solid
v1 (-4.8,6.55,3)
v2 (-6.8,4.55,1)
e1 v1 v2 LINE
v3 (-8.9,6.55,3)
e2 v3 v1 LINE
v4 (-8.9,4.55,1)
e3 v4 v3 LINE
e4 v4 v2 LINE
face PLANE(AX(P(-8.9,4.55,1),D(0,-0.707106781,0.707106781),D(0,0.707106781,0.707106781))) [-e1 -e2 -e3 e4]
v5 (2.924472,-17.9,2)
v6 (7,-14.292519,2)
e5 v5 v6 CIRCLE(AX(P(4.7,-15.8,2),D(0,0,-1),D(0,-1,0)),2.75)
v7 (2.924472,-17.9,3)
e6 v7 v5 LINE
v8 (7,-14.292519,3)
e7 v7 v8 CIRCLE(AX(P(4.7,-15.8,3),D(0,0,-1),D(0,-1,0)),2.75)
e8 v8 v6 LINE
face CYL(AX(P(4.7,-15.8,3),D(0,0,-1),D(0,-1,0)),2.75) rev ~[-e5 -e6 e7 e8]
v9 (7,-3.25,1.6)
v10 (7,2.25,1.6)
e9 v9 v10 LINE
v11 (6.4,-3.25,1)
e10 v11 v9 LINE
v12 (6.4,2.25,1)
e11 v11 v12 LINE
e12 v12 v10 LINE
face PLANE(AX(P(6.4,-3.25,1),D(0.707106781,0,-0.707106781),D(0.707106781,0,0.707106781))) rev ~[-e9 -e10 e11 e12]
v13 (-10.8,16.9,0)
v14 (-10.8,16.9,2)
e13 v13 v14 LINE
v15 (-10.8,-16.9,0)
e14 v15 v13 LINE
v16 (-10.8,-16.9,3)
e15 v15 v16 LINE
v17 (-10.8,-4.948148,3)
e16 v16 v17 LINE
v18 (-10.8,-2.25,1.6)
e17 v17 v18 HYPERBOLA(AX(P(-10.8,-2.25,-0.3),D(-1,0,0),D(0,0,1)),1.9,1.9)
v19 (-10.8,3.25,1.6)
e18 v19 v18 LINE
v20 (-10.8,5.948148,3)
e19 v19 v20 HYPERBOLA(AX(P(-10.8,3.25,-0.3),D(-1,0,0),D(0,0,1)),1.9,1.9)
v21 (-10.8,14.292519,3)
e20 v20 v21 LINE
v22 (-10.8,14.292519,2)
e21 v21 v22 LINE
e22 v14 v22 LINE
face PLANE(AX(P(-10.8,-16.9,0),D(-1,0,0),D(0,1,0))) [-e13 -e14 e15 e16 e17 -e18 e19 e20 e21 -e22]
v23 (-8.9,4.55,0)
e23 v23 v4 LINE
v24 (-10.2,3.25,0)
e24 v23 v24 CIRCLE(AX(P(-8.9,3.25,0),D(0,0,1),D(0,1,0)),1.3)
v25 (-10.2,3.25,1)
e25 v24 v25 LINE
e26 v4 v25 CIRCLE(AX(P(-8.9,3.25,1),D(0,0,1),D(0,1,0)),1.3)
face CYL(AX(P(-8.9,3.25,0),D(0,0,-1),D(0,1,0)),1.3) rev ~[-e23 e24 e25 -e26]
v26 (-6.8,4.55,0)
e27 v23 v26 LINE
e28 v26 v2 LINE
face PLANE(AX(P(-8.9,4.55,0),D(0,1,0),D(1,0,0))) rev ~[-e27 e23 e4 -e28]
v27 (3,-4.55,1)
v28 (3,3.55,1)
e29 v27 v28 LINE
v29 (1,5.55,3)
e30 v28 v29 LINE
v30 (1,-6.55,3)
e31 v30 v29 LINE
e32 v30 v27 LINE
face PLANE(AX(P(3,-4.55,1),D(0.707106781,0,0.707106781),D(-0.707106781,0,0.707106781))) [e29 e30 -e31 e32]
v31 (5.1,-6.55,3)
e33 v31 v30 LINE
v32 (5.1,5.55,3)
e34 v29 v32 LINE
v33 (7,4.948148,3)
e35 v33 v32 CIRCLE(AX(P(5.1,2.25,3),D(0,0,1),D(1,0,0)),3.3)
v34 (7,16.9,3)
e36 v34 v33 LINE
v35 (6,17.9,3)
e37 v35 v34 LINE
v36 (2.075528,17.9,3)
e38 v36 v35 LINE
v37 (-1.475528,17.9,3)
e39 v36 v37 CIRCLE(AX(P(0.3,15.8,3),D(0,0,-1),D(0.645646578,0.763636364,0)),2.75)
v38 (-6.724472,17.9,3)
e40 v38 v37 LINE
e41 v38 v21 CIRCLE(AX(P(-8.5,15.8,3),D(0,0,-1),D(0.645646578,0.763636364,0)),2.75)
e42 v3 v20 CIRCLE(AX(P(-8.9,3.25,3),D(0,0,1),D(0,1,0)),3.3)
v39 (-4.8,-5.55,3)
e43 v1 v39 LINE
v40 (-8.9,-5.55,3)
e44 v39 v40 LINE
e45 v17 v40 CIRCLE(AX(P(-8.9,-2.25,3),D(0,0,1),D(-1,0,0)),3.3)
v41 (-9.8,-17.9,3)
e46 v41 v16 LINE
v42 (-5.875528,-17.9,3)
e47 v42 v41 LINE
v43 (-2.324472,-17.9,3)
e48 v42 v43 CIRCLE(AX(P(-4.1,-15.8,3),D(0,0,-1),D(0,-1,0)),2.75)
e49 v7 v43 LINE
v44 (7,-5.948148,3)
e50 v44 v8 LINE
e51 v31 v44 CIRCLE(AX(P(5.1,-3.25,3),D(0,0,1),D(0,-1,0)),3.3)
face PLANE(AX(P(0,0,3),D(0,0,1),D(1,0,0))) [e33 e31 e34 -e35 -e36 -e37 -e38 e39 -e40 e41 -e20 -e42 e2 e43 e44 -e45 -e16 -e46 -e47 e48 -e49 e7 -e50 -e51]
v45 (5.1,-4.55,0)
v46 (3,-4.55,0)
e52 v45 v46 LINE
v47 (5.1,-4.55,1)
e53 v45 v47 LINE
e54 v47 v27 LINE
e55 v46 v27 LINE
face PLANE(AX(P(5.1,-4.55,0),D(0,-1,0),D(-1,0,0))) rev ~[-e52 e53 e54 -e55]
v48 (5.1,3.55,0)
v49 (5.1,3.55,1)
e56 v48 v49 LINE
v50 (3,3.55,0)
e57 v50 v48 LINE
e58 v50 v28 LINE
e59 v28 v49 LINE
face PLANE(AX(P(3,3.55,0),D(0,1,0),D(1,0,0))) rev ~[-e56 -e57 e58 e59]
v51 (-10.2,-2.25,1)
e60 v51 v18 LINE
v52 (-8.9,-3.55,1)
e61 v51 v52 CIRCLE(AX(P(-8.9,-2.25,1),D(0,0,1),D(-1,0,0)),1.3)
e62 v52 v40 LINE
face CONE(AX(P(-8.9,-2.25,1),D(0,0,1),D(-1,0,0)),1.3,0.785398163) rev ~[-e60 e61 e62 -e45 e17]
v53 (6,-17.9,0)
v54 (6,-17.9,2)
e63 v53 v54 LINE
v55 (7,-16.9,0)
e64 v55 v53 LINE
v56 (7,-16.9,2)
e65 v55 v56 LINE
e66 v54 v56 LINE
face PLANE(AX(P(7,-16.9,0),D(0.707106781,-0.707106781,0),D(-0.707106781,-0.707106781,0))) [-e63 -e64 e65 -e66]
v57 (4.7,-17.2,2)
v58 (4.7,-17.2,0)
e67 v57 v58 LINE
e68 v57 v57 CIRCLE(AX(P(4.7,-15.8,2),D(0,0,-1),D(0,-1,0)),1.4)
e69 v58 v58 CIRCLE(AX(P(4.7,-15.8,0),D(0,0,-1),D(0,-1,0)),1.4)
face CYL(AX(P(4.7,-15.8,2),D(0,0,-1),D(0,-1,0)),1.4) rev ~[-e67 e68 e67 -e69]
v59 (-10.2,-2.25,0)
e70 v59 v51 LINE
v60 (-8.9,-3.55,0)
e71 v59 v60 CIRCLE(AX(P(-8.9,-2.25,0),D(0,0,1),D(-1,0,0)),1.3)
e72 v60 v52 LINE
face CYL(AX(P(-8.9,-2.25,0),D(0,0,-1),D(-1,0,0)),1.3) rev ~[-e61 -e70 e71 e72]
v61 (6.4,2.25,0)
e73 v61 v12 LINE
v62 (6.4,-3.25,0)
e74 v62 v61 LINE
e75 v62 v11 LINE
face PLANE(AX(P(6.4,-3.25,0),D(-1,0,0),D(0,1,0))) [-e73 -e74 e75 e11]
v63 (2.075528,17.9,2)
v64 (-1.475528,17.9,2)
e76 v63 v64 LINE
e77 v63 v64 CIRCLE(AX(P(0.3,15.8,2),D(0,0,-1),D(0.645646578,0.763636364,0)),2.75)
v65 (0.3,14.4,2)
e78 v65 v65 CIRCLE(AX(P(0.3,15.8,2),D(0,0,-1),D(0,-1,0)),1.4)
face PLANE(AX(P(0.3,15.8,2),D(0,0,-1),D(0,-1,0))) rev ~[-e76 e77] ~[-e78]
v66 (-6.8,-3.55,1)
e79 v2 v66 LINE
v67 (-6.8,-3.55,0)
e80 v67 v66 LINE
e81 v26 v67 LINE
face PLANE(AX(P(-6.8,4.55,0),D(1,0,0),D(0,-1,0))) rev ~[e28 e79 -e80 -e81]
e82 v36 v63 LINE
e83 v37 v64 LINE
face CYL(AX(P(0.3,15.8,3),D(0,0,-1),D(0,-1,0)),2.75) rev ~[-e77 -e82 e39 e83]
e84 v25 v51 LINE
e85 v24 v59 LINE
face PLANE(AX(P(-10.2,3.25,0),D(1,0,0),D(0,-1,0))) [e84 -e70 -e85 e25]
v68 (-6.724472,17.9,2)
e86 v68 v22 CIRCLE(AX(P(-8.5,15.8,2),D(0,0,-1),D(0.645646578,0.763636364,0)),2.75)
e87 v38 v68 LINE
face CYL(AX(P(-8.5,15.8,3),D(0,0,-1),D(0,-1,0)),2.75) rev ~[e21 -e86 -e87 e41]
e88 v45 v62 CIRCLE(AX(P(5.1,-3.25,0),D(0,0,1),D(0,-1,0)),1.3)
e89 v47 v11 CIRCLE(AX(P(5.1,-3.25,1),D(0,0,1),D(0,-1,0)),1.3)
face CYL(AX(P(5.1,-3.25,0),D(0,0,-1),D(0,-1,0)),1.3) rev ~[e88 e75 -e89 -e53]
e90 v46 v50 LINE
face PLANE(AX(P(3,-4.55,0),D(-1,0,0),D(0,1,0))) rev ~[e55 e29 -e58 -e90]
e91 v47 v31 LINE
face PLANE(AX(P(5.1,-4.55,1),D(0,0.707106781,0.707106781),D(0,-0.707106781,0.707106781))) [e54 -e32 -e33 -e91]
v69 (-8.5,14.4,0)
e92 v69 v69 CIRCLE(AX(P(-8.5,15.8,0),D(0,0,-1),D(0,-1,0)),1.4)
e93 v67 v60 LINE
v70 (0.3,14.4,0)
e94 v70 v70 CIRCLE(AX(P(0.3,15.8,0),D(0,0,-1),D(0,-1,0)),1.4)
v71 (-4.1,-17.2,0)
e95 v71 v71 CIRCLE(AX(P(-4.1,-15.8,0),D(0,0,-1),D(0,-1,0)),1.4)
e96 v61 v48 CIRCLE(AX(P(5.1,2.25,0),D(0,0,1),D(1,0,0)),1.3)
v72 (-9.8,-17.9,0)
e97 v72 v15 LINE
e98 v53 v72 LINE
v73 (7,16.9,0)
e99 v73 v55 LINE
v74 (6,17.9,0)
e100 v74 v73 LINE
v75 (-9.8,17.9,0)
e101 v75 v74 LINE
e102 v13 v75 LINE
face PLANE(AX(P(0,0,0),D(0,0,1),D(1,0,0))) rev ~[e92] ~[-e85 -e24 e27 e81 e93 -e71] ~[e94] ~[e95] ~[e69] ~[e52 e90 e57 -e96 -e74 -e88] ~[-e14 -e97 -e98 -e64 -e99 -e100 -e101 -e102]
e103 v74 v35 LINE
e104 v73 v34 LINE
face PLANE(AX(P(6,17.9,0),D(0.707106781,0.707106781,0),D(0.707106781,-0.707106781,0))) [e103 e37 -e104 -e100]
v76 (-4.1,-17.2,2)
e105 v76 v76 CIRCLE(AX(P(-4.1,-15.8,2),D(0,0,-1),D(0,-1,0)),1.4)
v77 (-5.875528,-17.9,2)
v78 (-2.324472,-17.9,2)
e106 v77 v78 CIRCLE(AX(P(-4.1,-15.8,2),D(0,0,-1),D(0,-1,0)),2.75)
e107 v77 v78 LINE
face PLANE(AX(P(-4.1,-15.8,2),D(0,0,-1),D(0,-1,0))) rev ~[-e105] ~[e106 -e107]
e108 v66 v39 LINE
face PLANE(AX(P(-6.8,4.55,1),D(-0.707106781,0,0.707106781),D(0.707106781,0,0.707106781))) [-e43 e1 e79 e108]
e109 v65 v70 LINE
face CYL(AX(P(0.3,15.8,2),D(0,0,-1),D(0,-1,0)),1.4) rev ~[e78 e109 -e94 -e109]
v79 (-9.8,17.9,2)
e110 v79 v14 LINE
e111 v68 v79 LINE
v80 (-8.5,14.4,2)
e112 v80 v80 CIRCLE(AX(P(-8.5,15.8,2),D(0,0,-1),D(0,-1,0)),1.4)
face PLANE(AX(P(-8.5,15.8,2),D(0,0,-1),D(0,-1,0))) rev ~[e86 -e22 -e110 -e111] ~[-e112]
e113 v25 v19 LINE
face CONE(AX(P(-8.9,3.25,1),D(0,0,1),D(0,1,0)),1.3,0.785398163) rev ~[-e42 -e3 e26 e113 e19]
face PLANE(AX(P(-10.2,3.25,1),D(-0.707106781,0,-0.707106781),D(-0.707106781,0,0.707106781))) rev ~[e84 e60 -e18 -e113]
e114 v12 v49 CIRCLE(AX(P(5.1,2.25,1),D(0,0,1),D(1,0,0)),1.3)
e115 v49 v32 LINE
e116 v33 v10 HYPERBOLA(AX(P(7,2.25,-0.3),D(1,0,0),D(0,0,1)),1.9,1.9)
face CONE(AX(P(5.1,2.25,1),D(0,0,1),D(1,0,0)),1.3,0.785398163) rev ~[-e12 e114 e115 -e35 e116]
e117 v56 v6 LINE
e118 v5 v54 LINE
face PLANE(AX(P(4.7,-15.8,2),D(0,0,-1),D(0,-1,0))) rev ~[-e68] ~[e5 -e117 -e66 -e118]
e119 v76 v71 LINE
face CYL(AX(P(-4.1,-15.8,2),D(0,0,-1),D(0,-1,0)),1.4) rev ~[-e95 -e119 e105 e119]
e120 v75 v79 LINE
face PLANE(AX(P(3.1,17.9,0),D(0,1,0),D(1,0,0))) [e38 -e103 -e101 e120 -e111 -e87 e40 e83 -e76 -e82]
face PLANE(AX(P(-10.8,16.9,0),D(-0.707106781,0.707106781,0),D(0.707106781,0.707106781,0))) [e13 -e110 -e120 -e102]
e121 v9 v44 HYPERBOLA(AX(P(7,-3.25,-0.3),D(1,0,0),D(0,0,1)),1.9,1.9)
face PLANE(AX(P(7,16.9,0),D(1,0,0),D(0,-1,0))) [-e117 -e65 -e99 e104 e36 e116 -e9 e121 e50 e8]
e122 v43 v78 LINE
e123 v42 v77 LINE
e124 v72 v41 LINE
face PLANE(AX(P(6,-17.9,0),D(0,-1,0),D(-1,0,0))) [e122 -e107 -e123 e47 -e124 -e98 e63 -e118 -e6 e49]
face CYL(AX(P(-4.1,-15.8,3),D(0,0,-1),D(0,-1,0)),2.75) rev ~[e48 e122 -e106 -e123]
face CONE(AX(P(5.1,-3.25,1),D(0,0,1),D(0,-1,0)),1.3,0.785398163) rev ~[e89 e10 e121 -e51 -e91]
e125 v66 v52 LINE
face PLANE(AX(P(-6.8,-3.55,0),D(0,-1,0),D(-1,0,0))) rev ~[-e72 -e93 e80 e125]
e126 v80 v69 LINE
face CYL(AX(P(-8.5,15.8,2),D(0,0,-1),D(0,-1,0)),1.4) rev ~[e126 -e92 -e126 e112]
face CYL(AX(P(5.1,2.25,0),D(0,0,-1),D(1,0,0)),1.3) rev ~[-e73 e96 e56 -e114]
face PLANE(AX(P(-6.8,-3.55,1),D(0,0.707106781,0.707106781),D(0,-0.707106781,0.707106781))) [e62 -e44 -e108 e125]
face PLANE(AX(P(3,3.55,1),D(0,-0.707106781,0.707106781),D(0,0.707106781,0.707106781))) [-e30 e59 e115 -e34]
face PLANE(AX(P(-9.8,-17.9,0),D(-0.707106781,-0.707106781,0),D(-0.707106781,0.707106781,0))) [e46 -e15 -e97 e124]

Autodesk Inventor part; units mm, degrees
ref_plane "YZ Plane" through (0, 0, 0) normal (1, 0, 0) x (0, 1, 0)
ref_plane "XZ Plane" through (0, 0, 0) normal (0, 1, 0) x (-1, 0, 0)
ref_plane "XY Plane" through (0, 0, 0) normal (0, 0, 1) x (1, 0, 0)
ref_plane "Arbeitsebene1" through (0, 0, 0) normal (0, 0, 1) x (1, 0, 0)
sketch "Skizze1" plane through (0, 0, 0) normal (0, 0, 1) x (1, 0, 0)
  line L0 (6, 17.9) -> (7, 16.9) projected
  line L1 (3.1, 17.9) -> (6, 17.9) projected
  line L2 (3.1, 14) -> (3.1, 17.9) projected
  line L3 (3.5, 14) -> (3.1, 14) projected
  line L4 (3.5, 10) -> (3.5, 14) projected
  line L5 (6.4, 10) -> (3.5, 10) projected
  line L6 (6.4, -11.4) -> (6.4, 10) projected
  line L7 (3.8, -11.4) -> (6.4, -11.4) projected
  line L8 (3.8, -14.4) -> (3.8, -11.4) projected
  line L9 (1.3, -14.4) -> (3.8, -14.4) projected
  line L10 (1.3, -13.4) -> (1.3, -14.4) projected
  line L11 (-0.7, -13.4) -> (1.3, -13.4) projected
  line L12 (-0.7, -14.4) -> (-0.7, -13.4) projected
  line L13 (-6.9, -14.4) -> (-5.1, -14.4) projected
  line L14 (-4.1, -13.4) -> (-4.1, -14.4) projected
  line L15 (-5.1, -13.4) -> (-4.1, -13.4) projected
  line L16 (-5.1, -14.4) -> (-5.1, -13.4) projected
  line L17 (-6.9, -17.9) -> (-6.9, -14.4) projected
  line L18 (6, -17.9) -> (-6.9, -17.9) projected
  line L19 (7, -16.9) -> (6, -17.9) projected
  line L20 (7, 16.9) -> (7, -16.9) projected
  line L21 (6, 17.9) -> (7, 16.9) projected
  line L22 (3.1, 17.9) -> (6, 17.9) projected
  line L23 (3.1, 14) -> (3.1, 17.9) projected
  line L24 (3.5, 14) -> (3.1, 14) projected
  line L25 (3.5, 10) -> (3.5, 14) projected
  line L26 (6.4, 10) -> (3.5, 10) projected
  line L27 (6.4, -11.4) -> (6.4, 10) projected
  line L28 (3.8, -11.4) -> (6.4, -11.4) projected
  line L29 (3.8, -14.4) -> (3.8, -11.4) projected
  line L30 (1.3, -14.4) -> (3.8, -14.4) projected
  line L31 (1.3, -13.4) -> (1.3, -14.4) projected
  line L32 (-0.7, -13.4) -> (1.3, -13.4) projected
  line L33 (-0.7, -14.4) -> (-0.7, -13.4) projected
  line L34 (-6.9, -14.4) -> (-5.1, -14.4) projected
  line L35 (-4.1, -13.4) -> (-4.1, -14.4) projected
  line L36 (-5.1, -13.4) -> (-4.1, -13.4) projected
  line L37 (-5.1, -14.4) -> (-5.1, -13.4) projected
  line L38 (-6.9, -17.9) -> (-6.9, -14.4) projected
  line L39 (6, -17.9) -> (-6.9, -17.9) projected
  line L40 (7, -16.9) -> (6, -17.9) projected
  line L41 (7, 16.9) -> (7, -16.9) projected
  line L42 (-9.8, -17.9) -> (-10.8, -16.9) projected
  line L43 (-6.9, -17.9) -> (-9.8, -17.9) projected
  line L44 (-6.9, -14) -> (-6.9, -17.9) projected
  line L45 (-7.3, -14) -> (-6.9, -14) projected
  line L46 (-7.3, -10) -> (-7.3, -14) projected
  line L47 (-10.2, -10) -> (-7.3, -10) projected
  line L48 (-10.2, 11.4) -> (-10.2, -10) projected
  line L49 (-7.6, 11.4) -> (-10.2, 11.4) projected
  line L50 (-7.6, 14.4) -> (-7.6, 11.4) projected
  line L51 (-5.1, 14.4) -> (-7.6, 14.4) projected
  line L52 (-5.1, 13.4) -> (-5.1, 14.4) projected
  line L53 (-3.1, 13.4) -> (-5.1, 13.4) projected
  line L54 (-3.1, 14.4) -> (-3.1, 13.4) projected
  line L55 (3.1, 14.4) -> (1.3, 14.4) projected
  line L56 (0.3, 13.4) -> (0.3, 14.4) projected
  line L57 (1.3, 13.4) -> (0.3, 13.4) projected
  line L58 (1.3, 14.4) -> (1.3, 13.4) projected
  line L59 (3.1, 17.9) -> (3.1, 14.4) projected
  line L60 (-9.8, 17.9) -> (3.1, 17.9) projected
  line L61 (-10.8, 16.9) -> (-9.8, 17.9) projected
  line L62 (-10.8, -16.9) -> (-10.8, 16.9) projected
  arc A0 (5.1, -4.25) -> (6.1, -3.25) centre (5.1, -3.25) ccw construction
  line L63 (6.1, 2.25) -> (6.1, -3.25) construction
  arc A1 (6.1, 2.25) -> (5.1, 3.25) centre (5.1, 2.25) ccw construction
  line L64 (3.3, 3.25) -> (5.1, 3.25) construction
  line L65 (3.3, 3.25) -> (3.3, -4.25) construction
  line L66 (3.3, -4.25) -> (5.1, -4.25) construction
  arc A2 (-8.9, 4.25) -> (-9.9, 3.25) centre (-8.9, 3.25) ccw construction
  line L67 (-9.9, -2.25) -> (-9.9, 3.25) construction
  arc A3 (-9.9, -2.25) -> (-8.9, -3.25) centre (-8.9, -2.25) ccw construction
  line L68 (-7.1, -3.25) -> (-8.9, -3.25) construction
  line L69 (-7.1, -3.25) -> (-7.1, 4.25) construction
  line L70 (-7.1, 4.25) -> (-8.9, 4.25) construction
  line L71 (3, -4.55) -> (3, 3.55)
  line L72 (3, 3.55) -> (5.1, 3.55)
  arc A4 (6.4, 2.25) -> (5.1, 3.55) centre (5.1, 2.25) ccw
  line L73 (6.4, 2.25) -> (6.4, -3.25)
  arc A5 (5.1, -4.55) -> (6.4, -3.25) centre (5.1, -3.25) ccw
  line L74 (5.1, -4.55) -> (3, -4.55)
  arc A6 (-10.2, -2.25) -> (-8.9, -3.55) centre (-8.9, -2.25) ccw
  line L75 (-10.2, -2.25) -> (-10.2, 3.25)
  arc A7 (-8.9, 4.55) -> (-10.2, 3.25) centre (-8.9, 3.25) ccw
  line L76 (-8.9, 4.55) -> (-6.8, 4.55)
  line L77 (-6.8, 4.55) -> (-6.8, -3.55)
  line L78 (-6.8, -3.55) -> (-8.9, -3.55)
  circle A8 centre (4.7, -15.8) radius 1.4 projected
  circle A9 centre (4.7, -15.8) radius 1.4 projected
  circle A10 centre (-8.5, 15.8) radius 1.4 projected
  circle A11 centre (-4.1, -15.8) radius 1.4 projected
  circle A12 centre (-4.1, -15.8) radius 1.4 projected
  line L79 (-4.1, -14.4) -> (-0.7, -14.4) projected
  circle A13 centre (-4.1, -15.8) radius 1.4 projected
  circle A14 centre (-4.1, -15.8) radius 1.4 projected
  line L80 (-4.1, -14.4) -> (-0.7, -14.4) projected
  circle A15 centre (0.3, 15.8) radius 1.4 projected
  circle A16 centre (0.3, 15.8) radius 1.4 projected
  line L81 (0.3, 14.4) -> (-3.1, 14.4) projected
  point P0 (0, 0)
  point P1 (-2.4, -14.4)
  point P2 (-2.5, -14.4)
  point P3 (-1.4, 14.4)
  point P4 (-1.3, 14.4)
  dimension "d0" = 0.3
  dimension "d1" = 0.3
extrude "Extrusion1" add sketch "Skizze1" along normal blind 3 contours A11 | L0 L20 L19 L18 L17 L13 L16 L15 L14 L79 L12 L11 L10 L9 L8 L7 L6 L5 L4 L3 L2 L1 | A15 | L2 L55 L58 L57 L56 L81 L54 L53 L52 L51 L50 L49 L48 L47 L46 L45 L44 L17 L43 L42 L62 L61 L60 | L2 L3 L4 L5 L6 A4 L72 L71 L74 A5 L7 L8 L9 L10 L11 L12 L79 L14 L15 L16 L13 L44 L45 L46 L47 L48 A6 L78 L77 L76 A7 L49 L50 L51 L52 L53 L54 L81 L56 L57 L58 L55 | A8 | A10
sketch "Skizze2" plane through (0, 0, 3) normal (0, 0, 1) x (1, 0, 0)
  point P0 (0, 0)
sketch "Skizze3" plane through (0, 0, 3) normal (0, 0, 1) x (1, 0, 0)
  circle A0 centre (-8.5, 15.8) radius 1.4 projected
  circle A1 centre (0.3, 15.8) radius 1.4 projected
  circle A2 centre (4.7, -15.8) radius 1.4 projected
  circle A3 centre (-4.1, -15.8) radius 1.4 projected
  point P0 (0, 0)
hole "Bohrung1" at (0.3, 15.8, 3) at (4.7, -15.8, 3) at (-4.1, -15.8, 3) at (-8.5, 15.8, 3) direction (0, 0, -1) diameter 2.8 depth 12 tip angle 118 counterbore diameter 5.5 counterbore depth 1
chamfer "Fase1" distance 2 angle 45 12 edges at (6.0192, 3.1692, 3) (6.4, -0.5, 3) (6.0192, -4.1692, 3) (4.05, -4.55, 3) (4.05, 3.55, 3) (3, -0.5, 3) (-6.8, 0.5, 3) (-9.8192, 4.1692, 3) (-7.85, 4.55, 3) (-10.2, 0.5, 3) (-9.8192, -3.1692, 3) (-7.85, -3.55, 3)
properties part number "02_Camera_Module_Lid_v0"
